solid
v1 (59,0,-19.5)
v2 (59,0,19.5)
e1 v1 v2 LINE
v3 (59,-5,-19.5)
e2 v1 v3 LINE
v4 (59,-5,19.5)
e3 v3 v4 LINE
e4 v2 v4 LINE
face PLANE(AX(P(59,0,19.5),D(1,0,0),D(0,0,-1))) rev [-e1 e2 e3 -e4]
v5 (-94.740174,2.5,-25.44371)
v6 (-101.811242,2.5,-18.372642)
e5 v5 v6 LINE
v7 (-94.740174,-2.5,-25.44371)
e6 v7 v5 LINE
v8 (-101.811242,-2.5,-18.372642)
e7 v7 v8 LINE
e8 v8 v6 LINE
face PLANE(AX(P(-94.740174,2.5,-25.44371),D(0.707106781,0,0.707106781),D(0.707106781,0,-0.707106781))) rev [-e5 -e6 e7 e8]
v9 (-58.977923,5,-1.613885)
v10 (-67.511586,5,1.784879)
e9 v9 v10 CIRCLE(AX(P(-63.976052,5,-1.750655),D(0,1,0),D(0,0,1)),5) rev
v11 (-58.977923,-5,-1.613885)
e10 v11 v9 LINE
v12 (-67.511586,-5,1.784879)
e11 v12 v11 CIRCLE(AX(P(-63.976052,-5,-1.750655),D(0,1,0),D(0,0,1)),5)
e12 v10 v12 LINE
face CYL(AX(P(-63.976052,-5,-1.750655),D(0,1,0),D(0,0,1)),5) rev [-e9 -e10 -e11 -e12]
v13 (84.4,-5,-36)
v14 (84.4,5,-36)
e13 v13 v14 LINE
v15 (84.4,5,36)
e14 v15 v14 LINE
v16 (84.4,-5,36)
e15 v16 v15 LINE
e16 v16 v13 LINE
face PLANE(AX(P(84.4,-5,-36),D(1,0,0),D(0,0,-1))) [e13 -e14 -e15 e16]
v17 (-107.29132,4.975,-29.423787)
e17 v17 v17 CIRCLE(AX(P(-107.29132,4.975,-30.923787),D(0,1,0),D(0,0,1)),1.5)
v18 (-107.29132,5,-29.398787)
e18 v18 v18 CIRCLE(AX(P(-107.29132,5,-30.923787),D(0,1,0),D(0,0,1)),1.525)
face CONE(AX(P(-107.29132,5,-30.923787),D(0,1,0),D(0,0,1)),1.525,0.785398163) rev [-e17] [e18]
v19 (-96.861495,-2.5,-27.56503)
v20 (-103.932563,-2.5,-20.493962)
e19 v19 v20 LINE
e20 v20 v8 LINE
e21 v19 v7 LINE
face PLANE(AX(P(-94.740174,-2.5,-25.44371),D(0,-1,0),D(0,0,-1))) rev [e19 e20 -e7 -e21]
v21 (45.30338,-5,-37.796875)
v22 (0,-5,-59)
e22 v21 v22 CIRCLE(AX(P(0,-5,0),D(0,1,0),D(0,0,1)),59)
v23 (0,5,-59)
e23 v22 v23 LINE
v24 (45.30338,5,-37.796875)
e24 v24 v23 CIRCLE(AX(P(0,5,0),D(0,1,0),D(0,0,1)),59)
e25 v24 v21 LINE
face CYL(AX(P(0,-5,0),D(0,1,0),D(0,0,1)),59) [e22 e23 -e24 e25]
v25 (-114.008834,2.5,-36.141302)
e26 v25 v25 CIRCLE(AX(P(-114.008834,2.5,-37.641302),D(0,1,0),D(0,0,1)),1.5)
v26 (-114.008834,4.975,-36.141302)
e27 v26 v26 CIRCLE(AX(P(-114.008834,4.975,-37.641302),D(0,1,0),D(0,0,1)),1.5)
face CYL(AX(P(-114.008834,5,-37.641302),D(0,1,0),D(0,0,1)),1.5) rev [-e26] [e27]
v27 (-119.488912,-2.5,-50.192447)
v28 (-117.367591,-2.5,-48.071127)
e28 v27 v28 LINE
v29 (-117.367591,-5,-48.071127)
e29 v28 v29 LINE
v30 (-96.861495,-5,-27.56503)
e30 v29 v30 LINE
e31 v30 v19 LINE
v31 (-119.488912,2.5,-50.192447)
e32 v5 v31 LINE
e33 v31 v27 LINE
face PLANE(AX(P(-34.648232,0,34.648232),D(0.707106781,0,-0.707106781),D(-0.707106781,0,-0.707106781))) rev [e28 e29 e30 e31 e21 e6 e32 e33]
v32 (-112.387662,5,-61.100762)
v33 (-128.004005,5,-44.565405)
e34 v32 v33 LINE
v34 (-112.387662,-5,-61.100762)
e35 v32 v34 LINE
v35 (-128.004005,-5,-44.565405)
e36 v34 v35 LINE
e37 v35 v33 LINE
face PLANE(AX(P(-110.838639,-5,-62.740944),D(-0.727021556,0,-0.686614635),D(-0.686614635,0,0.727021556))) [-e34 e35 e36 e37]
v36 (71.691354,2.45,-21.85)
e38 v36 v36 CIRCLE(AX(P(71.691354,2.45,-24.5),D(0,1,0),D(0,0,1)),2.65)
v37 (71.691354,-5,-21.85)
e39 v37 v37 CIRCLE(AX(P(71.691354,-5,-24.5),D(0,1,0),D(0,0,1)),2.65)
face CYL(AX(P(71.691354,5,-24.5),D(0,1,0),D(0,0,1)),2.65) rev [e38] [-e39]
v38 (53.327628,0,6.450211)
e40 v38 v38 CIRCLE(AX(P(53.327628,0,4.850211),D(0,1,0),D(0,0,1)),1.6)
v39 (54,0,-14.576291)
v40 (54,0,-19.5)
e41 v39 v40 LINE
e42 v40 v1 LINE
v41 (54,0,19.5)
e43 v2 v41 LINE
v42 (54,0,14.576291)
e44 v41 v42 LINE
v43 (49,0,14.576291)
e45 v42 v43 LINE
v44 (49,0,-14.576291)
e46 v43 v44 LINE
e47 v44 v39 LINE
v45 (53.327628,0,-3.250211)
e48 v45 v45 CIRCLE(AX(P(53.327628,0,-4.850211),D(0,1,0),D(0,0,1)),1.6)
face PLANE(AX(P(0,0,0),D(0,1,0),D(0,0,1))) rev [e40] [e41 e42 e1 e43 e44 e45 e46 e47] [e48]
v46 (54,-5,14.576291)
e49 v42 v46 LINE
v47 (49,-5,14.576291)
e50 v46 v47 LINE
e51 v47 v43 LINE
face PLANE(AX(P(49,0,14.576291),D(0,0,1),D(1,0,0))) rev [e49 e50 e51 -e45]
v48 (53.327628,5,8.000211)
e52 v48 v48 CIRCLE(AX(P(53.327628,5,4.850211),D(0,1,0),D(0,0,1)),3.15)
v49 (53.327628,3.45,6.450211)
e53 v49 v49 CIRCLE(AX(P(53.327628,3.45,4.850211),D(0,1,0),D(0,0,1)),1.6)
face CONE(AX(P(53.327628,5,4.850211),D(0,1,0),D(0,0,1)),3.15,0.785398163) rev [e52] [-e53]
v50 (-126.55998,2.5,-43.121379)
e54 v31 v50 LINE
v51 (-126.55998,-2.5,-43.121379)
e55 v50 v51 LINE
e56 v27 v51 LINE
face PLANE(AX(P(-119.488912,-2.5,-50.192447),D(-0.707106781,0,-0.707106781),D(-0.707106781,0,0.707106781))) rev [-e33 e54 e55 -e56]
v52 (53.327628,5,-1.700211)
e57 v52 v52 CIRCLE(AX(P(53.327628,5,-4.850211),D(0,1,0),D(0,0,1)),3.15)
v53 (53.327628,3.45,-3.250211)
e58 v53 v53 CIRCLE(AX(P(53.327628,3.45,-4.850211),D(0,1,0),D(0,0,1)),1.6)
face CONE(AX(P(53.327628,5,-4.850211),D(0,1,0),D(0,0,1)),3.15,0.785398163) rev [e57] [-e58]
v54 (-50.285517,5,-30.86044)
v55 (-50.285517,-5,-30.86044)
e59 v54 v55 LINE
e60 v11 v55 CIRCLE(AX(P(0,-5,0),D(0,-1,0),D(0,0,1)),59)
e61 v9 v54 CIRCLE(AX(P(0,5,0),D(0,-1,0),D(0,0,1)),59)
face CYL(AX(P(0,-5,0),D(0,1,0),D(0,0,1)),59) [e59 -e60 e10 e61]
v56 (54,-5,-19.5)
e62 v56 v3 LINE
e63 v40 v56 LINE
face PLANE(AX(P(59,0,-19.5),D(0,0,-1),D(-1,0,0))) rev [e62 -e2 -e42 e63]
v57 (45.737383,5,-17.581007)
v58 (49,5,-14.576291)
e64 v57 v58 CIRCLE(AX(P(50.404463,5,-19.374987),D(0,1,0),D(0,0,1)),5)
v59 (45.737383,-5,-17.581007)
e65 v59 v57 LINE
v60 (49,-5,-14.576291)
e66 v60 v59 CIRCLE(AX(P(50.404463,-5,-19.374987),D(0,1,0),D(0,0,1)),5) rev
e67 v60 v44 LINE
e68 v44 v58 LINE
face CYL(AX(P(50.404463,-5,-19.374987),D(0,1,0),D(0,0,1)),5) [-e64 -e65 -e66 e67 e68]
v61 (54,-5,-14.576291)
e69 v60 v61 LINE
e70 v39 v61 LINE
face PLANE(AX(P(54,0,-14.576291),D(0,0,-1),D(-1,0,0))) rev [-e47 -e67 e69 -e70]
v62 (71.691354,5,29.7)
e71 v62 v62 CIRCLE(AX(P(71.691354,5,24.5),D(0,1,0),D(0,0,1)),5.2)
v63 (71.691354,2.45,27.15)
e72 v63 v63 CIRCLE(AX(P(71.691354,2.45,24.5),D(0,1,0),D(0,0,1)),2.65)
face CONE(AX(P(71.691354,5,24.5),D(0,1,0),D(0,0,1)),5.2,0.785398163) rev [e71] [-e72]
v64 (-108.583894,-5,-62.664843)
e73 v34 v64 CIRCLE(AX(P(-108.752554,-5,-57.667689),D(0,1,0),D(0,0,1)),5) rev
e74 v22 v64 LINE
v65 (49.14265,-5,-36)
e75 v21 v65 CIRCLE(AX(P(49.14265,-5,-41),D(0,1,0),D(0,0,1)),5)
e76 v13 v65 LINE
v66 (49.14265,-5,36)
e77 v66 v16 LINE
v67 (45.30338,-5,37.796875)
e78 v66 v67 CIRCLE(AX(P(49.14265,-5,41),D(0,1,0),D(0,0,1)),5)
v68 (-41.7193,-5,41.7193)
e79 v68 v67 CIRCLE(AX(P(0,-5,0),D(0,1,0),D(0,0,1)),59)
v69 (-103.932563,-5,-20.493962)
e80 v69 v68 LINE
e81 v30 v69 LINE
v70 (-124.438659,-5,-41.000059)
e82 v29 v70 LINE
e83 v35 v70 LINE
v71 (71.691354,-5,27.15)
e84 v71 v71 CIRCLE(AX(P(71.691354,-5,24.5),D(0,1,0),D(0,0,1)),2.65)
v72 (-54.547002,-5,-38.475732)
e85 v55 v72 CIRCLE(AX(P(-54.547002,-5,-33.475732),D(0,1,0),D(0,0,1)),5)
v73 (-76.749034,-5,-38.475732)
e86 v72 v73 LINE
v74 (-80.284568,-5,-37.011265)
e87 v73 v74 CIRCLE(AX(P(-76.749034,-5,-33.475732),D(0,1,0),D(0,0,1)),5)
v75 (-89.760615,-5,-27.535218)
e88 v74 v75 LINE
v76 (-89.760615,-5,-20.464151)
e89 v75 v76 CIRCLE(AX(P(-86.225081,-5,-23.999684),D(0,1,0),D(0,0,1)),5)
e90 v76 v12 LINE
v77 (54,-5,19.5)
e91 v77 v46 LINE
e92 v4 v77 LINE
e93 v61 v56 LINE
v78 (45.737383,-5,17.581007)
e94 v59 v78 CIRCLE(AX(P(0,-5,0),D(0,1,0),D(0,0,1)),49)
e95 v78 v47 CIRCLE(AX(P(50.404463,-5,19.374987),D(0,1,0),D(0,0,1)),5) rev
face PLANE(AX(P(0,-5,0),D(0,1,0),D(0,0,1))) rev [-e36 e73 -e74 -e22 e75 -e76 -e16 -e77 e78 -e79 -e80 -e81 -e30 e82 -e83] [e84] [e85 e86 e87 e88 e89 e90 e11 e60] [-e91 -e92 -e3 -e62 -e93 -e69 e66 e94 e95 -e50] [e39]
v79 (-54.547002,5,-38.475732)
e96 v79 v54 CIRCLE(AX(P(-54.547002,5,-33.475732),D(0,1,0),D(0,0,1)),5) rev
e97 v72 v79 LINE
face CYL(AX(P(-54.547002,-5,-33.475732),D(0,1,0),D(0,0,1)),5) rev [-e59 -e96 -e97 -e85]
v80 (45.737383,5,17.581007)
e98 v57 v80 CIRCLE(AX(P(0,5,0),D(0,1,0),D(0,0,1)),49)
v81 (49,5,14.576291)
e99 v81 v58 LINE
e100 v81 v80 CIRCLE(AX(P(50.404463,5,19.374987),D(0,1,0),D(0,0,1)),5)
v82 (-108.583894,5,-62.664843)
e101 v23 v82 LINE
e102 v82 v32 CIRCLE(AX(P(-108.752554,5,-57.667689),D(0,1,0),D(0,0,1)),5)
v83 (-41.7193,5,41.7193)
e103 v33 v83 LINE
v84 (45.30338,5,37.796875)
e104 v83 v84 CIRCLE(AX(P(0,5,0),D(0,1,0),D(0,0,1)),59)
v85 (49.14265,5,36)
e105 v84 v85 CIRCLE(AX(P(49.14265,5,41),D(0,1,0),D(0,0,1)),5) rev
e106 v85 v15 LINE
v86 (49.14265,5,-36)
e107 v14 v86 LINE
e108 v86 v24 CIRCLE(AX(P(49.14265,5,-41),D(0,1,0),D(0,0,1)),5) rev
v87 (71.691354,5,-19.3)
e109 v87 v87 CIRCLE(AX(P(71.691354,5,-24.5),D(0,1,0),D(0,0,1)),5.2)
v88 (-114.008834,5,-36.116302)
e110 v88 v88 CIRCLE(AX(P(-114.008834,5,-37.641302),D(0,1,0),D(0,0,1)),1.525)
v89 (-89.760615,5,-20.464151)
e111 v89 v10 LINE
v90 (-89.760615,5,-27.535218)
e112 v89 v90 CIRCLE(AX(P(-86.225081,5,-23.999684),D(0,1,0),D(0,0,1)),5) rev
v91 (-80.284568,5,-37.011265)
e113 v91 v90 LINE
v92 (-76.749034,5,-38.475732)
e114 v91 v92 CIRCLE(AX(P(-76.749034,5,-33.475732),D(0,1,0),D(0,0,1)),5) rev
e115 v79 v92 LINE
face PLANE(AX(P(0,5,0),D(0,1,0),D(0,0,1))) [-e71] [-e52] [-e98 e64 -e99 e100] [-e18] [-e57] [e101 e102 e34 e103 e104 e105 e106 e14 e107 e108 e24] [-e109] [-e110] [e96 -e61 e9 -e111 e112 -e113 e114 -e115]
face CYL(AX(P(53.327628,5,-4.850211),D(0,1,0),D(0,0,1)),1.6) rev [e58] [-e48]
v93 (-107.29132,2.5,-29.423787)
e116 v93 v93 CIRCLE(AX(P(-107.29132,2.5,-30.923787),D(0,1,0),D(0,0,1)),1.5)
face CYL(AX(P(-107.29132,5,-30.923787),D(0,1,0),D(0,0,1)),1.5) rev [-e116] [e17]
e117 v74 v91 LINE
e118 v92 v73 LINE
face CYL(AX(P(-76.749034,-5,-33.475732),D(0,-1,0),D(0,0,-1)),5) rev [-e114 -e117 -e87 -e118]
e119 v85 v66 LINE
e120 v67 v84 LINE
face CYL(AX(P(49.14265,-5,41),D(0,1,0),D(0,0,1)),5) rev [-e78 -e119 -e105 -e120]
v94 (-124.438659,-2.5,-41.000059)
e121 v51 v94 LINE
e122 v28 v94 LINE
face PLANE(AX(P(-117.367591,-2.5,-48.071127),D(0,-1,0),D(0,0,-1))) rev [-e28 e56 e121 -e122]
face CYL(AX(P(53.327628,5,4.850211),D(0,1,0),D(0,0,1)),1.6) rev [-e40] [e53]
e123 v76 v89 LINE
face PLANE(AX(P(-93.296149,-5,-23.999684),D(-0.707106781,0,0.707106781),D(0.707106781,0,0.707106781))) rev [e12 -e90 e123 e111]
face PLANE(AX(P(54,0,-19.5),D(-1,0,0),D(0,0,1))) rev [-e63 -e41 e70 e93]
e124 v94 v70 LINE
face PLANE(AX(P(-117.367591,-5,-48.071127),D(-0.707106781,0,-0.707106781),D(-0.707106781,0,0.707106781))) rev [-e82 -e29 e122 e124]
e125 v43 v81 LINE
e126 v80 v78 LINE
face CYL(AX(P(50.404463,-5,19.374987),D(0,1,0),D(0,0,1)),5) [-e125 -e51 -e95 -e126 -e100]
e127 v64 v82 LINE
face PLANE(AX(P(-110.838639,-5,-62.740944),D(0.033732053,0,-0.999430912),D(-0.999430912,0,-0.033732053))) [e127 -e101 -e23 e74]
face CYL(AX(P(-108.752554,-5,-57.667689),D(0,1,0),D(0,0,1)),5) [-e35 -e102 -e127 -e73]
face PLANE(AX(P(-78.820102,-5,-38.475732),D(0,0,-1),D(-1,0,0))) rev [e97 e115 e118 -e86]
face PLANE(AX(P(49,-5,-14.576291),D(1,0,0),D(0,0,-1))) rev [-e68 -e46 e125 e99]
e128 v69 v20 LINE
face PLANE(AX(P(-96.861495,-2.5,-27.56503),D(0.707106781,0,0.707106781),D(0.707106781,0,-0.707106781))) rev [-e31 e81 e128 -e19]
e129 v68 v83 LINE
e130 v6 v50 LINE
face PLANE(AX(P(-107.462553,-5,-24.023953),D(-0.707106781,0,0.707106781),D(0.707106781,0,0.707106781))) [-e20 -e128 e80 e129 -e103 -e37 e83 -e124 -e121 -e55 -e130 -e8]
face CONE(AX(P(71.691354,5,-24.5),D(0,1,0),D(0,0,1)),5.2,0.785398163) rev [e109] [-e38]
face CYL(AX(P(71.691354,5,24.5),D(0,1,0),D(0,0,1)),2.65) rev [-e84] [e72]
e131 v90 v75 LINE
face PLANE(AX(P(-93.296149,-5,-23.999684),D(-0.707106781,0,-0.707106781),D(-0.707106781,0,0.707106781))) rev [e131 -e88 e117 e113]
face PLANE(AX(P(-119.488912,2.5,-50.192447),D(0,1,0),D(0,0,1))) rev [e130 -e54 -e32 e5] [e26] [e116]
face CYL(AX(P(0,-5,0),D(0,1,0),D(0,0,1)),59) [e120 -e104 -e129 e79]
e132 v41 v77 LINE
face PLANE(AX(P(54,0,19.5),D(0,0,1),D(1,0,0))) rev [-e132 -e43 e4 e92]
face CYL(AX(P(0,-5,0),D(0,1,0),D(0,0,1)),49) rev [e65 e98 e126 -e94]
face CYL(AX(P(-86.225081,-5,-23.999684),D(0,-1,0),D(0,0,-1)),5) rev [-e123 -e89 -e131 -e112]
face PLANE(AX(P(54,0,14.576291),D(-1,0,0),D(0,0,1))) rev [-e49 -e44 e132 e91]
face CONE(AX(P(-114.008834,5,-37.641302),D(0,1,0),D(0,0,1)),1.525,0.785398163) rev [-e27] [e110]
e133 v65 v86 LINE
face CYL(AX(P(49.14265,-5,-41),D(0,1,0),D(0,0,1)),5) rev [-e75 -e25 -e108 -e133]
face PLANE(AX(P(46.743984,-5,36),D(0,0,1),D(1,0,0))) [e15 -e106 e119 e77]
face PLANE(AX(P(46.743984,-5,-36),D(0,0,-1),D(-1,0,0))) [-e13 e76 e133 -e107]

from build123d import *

# Parameters (mm, degrees)
BOSS_EXTRUDE1_DEPTH                             = 5
FILLET1_R                                       = 5
CUT_EXTRUDE1_DEPTH                              = 10
F_3_0MM_PRESS_DOWEL_HOLE2_D                     = 3
F_3_0MM_PRESS_DOWEL_HOLE2_CSINK_D               = 3.05
F_3_0MM_PRESS_DOWEL_HOLE2_CSINK_ANGLE           = 90
CUT_EXTRUDE2_DEPTH                              = 5
CSK_FOR_M3_FLAT_HEAD_MACHINE_SCREW2_D           = 3.2
CSK_FOR_M3_FLAT_HEAD_MACHINE_SCREW2_CSINK_D     = 6.3
CSK_FOR_M3_FLAT_HEAD_MACHINE_SCREW2_CSINK_ANGLE = 90


with BuildPart() as part:
    # Sketch1 → Boss-Extrude1 (new, symmetric)
    with BuildSketch(Plane(origin=(0, 0, 0), x_dir=(1, 0, 0), z_dir=(0, 1, 0))):
        with BuildLine():
            Line((-107.462553071, 24.023952891), (-41.71930009, -41.71930009))
            ThreePointArc((-41.71930009, -41.71930009), (3.806502253, -58.877079926), (46.74398357, -36))
            Line((46.74398357, -36), (84.4, -36))
            Line((84.4, -36), (84.4, 36))
            Line((84.4, 36), (46.74398357, 36))
            ThreePointArc((46.74398357, 36), (26.048032555, 52.93864373), (0, 59))
            Line((0, 59), (-110.83863918, 62.740943777))
            Line((-110.83863918, 62.740943777), (-128.004005064, 44.565404884))
            Line((-128.004005064, 44.565404884), (-107.462553071, 24.023952891))
        make_face()
        with BuildLine():
            Line((49, 14.576290822), (46.781745862, 14.576290822))
            ThreePointArc((46.781745862, 14.576290822), (-49, 0), (46.781745862, -14.576290822))
            Line((46.781745862, -14.576290822), (49, -14.576290822))
            Line((49, -14.576290822), (49, 14.576290822))
        make_face(mode=Mode.SUBTRACT)
        with BuildLine():
            Line((-93.296148974, 23.999684418), (-57.886132355, -11.410332201))
            ThreePointArc((-57.886132355, -11.410332201), (-57.048958802, 15.047135926), (-44.728269399, 38.475731527))
            Line((-44.728269399, 38.475731527), (-78.820101865, 38.475731527))
            Line((-78.820101865, 38.475731527), (-93.296148974, 23.999684418))
        make_face(mode=Mode.SUBTRACT)
    extrude(amount=BOSS_EXTRUDE1_DEPTH, both=True)

    # Fillet1
    # the kernel refuses this fillet: 5 mm, written as the material it adds along each edge
    with BuildSketch(Plane(origin=(46.74398357, -5, 36), x_dir=(1, 0, 0), z_dir=(0, 1, 0))) as fillet1_piece_1:
        with BuildLine():
            CenterArc((2.398665931, -5), FILLET1_R, 90, 50.161560023)
            ThreePointArc((-1.440603561, -1.796875), (-0.711533327, -0.905467408), (0, 0))
            Line((0, 0), (2.398665931, 0))
        make_face()
    extrude(amount=10)
    with BuildSketch(Plane(origin=(46.74398357, -5, -36), x_dir=(-0.6255163967442842, 0, -0.7802110210731757), z_dir=(0, 1, 0))) as fillet1_piece_2:
        with BuildLine():
            CenterArc((2.400650235, -4.999047579), FILLET1_R, 91.118340331, 50.161560023)
            Line((-1.50040487, -1.871465595), (0, 0))
            ThreePointArc((0, 0), (1.151531414, -0.011238567), (2.303062827, 0))
        make_face()
    extrude(amount=10)
    with BuildSketch(Plane(origin=(-93.296148974, -5, -23.999684418), x_dir=(0.7071067811865472, 0, -0.7071067811865479), z_dir=(0, 1, 0))) as fillet1_piece_3:
        with BuildLine():
            CenterArc((FILLET1_R, -FILLET1_R), FILLET1_R, 90, 90)
            Line((0, -FILLET1_R), (0, 0))
            Line((0, 0), (FILLET1_R, 0))
        make_face()
    extrude(amount=10)
    with BuildSketch(Plane(origin=(-78.820101865, -5, -38.475731527), x_dir=(1, 0, 0), z_dir=(0, 1, 0))) as fillet1_piece_4:
        with BuildLine():
            CenterArc((FILLET1_R * 0.414213562373, -FILLET1_R), FILLET1_R, 90, 45)
            Line((-FILLET1_R * 0.292893218813, -FILLET1_R * 0.292893218813), (0, 0))
            Line((0, 0), (FILLET1_R * 0.414213562373, 0))
        make_face()
    extrude(amount=10)
    with BuildSketch(Plane(origin=(-57.886132355, -5, 11.410332201), x_dir=(-0.7071067811865467, 0, -0.7071067811865482), z_dir=(0, 1, 0))) as fillet1_piece_5:
        with BuildLine():
            CenterArc((13.612446704, -5), FILLET1_R, 90, 133.432536558)
            ThreePointArc((9.981524817, -8.4375), (5.225121697, -3.941504009), (0, 0))
            Line((0, 0), (13.612446704, 0))
        make_face()
    extrude(amount=10)
    with BuildSketch(Plane(origin=(-44.728269399, 5, -38.475731527), x_dir=(-1, 0, 0), z_dir=(0, -1, 0))) as fillet1_piece_6:
        with BuildLine():
            CenterArc((9.81873234, -5), FILLET1_R, 90, 121.53762105)
            ThreePointArc((5.557247829, -7.615291526), (2.930969774, -3.696471595), (0, 0))
            Line((0, 0), (9.81873234, 0))
        make_face()
    extrude(amount=10)
    # the kernel refuses this fillet: 5 mm, written as the material it takes off along each edge
    with BuildSketch(Plane(origin=(46.781745862, 12.95259813, 14.576290822), x_dir=(-0.32830869078175484, 0, 0.9445704862831413), z_dir=(0, -1, 0)), Plane(origin=(46.781745862, -12.95259813, -14.576290822), x_dir=(-0.32830869078175745, 0, -0.9445704862831404), z_dir=(0, 1, 0))) as fillet1_2_piece_1:
        with BuildLine():
            CenterArc((3.343337173, -4.997365244), FILLET1_R, 91.860123923, 52.660239811)
            Line((-0.728272112, -2.09529739), (0, 0))
            ThreePointArc((0, 0), (1.590519626, -0.025820606), (3.181039252, 0))
        make_face()
    extrude(amount=25.90519626, mode=Mode.SUBTRACT)
    with BuildSketch(Plane(origin=(-110.83863918, 10.640073082, -62.740943777), x_dir=(-0.6866146353868613, 0, 0.7270215557138366), z_dir=(0, -1, 0))) as fillet1_2_piece_2:
        with BuildLine():
            CenterArc((FILLET1_R * 0.451205846565, -FILLET1_R), FILLET1_R, 90, 48.570349235)
            Line((-FILLET1_R * 0.298562891452, -FILLET1_R * 0.338300038165), (0, 0))
            Line((0, 0), (FILLET1_R * 0.451205846565, 0))
        make_face()
    extrude(amount=21.280146164, mode=Mode.SUBTRACT)

    # Sketch11 → Cut-Extrude1 (cut)
    with BuildSketch(Plane(origin=(-41.71930009, 0, 41.71930009), x_dir=(0.7071067811865458, 0, 0.7071067811865492), z_dir=(-0.7071067811865492, 0, 0.7071067811865458))):
        Polygon((-116.982839598, -5), (-116.982839598, -2.5), (-119.982839598, -2.5), (-119.982839598, 2.5), (-84.982839598, 2.5), (-84.982839598, -2.5), (-87.982839598, -2.5), (-87.982839598, -5), align=None)
    extrude(amount=-CUT_EXTRUDE1_DEPTH, mode=Mode.SUBTRACT)

    # Ø3.0mm Press Dowel Hole2 (through all)
    with Locations(Plane(origin=(-114.00883423, 5, -37.641301862), x_dir=(0, 0, 1), z_dir=(0, 1, 0))):
        with Locations((0, 0), (6.717514422, 6.717514421)):
            CounterSinkHole(F_3_0MM_PRESS_DOWEL_HOLE2_D / 2, F_3_0MM_PRESS_DOWEL_HOLE2_CSINK_D / 2, counter_sink_angle=F_3_0MM_PRESS_DOWEL_HOLE2_CSINK_ANGLE)

    # Sketch15 → Cut-Extrude2 (cut)
    with BuildSketch(Plane(origin=(0, -5, 0), x_dir=(-1, 0, 0), z_dir=(0, -1, 0))):
        Polygon((-49, -14.576290822), (-54, -14.576290822), (-54, -19.5), (-59, -19.5), (-59, 19.5), (-54, 19.5), (-54, 14.576290822), (-49, 14.576290822), align=None)
    extrude(amount=-CUT_EXTRUDE2_DEPTH, mode=Mode.SUBTRACT)

    # CSK for M3 Flat Head Machine Screw2 (through all)
    with Locations(Plane(origin=(53.32762779, 5, -4.850211012), x_dir=(0, 0, 1), z_dir=(0, 1, 0))):
        with Locations((0, 0), (9.700422024, 0)):
            CounterSinkHole(CSK_FOR_M3_FLAT_HEAD_MACHINE_SCREW2_D / 2, CSK_FOR_M3_FLAT_HEAD_MACHINE_SCREW2_CSINK_D / 2, counter_sink_angle=CSK_FOR_M3_FLAT_HEAD_MACHINE_SCREW2_CSINK_ANGLE)

    # CSK for M5 Flat Head Machine Screw2: read off the stored shape, not the designer's step
    # CSK for M5 Flat Head Machine Screw2 outl → CSK for M5 Flat Head Machine Screw2 (revolve, cut)
    with BuildSketch(Plane(origin=(71.691354027, 0, 24.5), x_dir=(1, 0, 0), z_dir=(0, 0, 1))):
        Polygon((0, -5), (2.65, -5), (2.65, 2.45), (5.2, 5), (0, 5), align=None)
    revolve(axis=Axis((71.691354027, 0, 24.5), (0, 1, 0)), mode=Mode.SUBTRACT)

    # CSK for M5 Flat Head Machine Screw2 2 ou → CSK for M5 Flat Head Machine Screw2 2 (revolve, cut)
    with BuildSketch(Plane(origin=(71.691354027, 0, -24.5), x_dir=(1, 0, 0), z_dir=(0, 0, 1))):
        Polygon((0, -5), (2.65, -5), (2.65, 2.45), (5.2, 5), (0, 5), align=None)
    revolve(axis=Axis((71.691354027, 0, -24.5), (0, 1, 0)), mode=Mode.SUBTRACT)


solid = part.part
